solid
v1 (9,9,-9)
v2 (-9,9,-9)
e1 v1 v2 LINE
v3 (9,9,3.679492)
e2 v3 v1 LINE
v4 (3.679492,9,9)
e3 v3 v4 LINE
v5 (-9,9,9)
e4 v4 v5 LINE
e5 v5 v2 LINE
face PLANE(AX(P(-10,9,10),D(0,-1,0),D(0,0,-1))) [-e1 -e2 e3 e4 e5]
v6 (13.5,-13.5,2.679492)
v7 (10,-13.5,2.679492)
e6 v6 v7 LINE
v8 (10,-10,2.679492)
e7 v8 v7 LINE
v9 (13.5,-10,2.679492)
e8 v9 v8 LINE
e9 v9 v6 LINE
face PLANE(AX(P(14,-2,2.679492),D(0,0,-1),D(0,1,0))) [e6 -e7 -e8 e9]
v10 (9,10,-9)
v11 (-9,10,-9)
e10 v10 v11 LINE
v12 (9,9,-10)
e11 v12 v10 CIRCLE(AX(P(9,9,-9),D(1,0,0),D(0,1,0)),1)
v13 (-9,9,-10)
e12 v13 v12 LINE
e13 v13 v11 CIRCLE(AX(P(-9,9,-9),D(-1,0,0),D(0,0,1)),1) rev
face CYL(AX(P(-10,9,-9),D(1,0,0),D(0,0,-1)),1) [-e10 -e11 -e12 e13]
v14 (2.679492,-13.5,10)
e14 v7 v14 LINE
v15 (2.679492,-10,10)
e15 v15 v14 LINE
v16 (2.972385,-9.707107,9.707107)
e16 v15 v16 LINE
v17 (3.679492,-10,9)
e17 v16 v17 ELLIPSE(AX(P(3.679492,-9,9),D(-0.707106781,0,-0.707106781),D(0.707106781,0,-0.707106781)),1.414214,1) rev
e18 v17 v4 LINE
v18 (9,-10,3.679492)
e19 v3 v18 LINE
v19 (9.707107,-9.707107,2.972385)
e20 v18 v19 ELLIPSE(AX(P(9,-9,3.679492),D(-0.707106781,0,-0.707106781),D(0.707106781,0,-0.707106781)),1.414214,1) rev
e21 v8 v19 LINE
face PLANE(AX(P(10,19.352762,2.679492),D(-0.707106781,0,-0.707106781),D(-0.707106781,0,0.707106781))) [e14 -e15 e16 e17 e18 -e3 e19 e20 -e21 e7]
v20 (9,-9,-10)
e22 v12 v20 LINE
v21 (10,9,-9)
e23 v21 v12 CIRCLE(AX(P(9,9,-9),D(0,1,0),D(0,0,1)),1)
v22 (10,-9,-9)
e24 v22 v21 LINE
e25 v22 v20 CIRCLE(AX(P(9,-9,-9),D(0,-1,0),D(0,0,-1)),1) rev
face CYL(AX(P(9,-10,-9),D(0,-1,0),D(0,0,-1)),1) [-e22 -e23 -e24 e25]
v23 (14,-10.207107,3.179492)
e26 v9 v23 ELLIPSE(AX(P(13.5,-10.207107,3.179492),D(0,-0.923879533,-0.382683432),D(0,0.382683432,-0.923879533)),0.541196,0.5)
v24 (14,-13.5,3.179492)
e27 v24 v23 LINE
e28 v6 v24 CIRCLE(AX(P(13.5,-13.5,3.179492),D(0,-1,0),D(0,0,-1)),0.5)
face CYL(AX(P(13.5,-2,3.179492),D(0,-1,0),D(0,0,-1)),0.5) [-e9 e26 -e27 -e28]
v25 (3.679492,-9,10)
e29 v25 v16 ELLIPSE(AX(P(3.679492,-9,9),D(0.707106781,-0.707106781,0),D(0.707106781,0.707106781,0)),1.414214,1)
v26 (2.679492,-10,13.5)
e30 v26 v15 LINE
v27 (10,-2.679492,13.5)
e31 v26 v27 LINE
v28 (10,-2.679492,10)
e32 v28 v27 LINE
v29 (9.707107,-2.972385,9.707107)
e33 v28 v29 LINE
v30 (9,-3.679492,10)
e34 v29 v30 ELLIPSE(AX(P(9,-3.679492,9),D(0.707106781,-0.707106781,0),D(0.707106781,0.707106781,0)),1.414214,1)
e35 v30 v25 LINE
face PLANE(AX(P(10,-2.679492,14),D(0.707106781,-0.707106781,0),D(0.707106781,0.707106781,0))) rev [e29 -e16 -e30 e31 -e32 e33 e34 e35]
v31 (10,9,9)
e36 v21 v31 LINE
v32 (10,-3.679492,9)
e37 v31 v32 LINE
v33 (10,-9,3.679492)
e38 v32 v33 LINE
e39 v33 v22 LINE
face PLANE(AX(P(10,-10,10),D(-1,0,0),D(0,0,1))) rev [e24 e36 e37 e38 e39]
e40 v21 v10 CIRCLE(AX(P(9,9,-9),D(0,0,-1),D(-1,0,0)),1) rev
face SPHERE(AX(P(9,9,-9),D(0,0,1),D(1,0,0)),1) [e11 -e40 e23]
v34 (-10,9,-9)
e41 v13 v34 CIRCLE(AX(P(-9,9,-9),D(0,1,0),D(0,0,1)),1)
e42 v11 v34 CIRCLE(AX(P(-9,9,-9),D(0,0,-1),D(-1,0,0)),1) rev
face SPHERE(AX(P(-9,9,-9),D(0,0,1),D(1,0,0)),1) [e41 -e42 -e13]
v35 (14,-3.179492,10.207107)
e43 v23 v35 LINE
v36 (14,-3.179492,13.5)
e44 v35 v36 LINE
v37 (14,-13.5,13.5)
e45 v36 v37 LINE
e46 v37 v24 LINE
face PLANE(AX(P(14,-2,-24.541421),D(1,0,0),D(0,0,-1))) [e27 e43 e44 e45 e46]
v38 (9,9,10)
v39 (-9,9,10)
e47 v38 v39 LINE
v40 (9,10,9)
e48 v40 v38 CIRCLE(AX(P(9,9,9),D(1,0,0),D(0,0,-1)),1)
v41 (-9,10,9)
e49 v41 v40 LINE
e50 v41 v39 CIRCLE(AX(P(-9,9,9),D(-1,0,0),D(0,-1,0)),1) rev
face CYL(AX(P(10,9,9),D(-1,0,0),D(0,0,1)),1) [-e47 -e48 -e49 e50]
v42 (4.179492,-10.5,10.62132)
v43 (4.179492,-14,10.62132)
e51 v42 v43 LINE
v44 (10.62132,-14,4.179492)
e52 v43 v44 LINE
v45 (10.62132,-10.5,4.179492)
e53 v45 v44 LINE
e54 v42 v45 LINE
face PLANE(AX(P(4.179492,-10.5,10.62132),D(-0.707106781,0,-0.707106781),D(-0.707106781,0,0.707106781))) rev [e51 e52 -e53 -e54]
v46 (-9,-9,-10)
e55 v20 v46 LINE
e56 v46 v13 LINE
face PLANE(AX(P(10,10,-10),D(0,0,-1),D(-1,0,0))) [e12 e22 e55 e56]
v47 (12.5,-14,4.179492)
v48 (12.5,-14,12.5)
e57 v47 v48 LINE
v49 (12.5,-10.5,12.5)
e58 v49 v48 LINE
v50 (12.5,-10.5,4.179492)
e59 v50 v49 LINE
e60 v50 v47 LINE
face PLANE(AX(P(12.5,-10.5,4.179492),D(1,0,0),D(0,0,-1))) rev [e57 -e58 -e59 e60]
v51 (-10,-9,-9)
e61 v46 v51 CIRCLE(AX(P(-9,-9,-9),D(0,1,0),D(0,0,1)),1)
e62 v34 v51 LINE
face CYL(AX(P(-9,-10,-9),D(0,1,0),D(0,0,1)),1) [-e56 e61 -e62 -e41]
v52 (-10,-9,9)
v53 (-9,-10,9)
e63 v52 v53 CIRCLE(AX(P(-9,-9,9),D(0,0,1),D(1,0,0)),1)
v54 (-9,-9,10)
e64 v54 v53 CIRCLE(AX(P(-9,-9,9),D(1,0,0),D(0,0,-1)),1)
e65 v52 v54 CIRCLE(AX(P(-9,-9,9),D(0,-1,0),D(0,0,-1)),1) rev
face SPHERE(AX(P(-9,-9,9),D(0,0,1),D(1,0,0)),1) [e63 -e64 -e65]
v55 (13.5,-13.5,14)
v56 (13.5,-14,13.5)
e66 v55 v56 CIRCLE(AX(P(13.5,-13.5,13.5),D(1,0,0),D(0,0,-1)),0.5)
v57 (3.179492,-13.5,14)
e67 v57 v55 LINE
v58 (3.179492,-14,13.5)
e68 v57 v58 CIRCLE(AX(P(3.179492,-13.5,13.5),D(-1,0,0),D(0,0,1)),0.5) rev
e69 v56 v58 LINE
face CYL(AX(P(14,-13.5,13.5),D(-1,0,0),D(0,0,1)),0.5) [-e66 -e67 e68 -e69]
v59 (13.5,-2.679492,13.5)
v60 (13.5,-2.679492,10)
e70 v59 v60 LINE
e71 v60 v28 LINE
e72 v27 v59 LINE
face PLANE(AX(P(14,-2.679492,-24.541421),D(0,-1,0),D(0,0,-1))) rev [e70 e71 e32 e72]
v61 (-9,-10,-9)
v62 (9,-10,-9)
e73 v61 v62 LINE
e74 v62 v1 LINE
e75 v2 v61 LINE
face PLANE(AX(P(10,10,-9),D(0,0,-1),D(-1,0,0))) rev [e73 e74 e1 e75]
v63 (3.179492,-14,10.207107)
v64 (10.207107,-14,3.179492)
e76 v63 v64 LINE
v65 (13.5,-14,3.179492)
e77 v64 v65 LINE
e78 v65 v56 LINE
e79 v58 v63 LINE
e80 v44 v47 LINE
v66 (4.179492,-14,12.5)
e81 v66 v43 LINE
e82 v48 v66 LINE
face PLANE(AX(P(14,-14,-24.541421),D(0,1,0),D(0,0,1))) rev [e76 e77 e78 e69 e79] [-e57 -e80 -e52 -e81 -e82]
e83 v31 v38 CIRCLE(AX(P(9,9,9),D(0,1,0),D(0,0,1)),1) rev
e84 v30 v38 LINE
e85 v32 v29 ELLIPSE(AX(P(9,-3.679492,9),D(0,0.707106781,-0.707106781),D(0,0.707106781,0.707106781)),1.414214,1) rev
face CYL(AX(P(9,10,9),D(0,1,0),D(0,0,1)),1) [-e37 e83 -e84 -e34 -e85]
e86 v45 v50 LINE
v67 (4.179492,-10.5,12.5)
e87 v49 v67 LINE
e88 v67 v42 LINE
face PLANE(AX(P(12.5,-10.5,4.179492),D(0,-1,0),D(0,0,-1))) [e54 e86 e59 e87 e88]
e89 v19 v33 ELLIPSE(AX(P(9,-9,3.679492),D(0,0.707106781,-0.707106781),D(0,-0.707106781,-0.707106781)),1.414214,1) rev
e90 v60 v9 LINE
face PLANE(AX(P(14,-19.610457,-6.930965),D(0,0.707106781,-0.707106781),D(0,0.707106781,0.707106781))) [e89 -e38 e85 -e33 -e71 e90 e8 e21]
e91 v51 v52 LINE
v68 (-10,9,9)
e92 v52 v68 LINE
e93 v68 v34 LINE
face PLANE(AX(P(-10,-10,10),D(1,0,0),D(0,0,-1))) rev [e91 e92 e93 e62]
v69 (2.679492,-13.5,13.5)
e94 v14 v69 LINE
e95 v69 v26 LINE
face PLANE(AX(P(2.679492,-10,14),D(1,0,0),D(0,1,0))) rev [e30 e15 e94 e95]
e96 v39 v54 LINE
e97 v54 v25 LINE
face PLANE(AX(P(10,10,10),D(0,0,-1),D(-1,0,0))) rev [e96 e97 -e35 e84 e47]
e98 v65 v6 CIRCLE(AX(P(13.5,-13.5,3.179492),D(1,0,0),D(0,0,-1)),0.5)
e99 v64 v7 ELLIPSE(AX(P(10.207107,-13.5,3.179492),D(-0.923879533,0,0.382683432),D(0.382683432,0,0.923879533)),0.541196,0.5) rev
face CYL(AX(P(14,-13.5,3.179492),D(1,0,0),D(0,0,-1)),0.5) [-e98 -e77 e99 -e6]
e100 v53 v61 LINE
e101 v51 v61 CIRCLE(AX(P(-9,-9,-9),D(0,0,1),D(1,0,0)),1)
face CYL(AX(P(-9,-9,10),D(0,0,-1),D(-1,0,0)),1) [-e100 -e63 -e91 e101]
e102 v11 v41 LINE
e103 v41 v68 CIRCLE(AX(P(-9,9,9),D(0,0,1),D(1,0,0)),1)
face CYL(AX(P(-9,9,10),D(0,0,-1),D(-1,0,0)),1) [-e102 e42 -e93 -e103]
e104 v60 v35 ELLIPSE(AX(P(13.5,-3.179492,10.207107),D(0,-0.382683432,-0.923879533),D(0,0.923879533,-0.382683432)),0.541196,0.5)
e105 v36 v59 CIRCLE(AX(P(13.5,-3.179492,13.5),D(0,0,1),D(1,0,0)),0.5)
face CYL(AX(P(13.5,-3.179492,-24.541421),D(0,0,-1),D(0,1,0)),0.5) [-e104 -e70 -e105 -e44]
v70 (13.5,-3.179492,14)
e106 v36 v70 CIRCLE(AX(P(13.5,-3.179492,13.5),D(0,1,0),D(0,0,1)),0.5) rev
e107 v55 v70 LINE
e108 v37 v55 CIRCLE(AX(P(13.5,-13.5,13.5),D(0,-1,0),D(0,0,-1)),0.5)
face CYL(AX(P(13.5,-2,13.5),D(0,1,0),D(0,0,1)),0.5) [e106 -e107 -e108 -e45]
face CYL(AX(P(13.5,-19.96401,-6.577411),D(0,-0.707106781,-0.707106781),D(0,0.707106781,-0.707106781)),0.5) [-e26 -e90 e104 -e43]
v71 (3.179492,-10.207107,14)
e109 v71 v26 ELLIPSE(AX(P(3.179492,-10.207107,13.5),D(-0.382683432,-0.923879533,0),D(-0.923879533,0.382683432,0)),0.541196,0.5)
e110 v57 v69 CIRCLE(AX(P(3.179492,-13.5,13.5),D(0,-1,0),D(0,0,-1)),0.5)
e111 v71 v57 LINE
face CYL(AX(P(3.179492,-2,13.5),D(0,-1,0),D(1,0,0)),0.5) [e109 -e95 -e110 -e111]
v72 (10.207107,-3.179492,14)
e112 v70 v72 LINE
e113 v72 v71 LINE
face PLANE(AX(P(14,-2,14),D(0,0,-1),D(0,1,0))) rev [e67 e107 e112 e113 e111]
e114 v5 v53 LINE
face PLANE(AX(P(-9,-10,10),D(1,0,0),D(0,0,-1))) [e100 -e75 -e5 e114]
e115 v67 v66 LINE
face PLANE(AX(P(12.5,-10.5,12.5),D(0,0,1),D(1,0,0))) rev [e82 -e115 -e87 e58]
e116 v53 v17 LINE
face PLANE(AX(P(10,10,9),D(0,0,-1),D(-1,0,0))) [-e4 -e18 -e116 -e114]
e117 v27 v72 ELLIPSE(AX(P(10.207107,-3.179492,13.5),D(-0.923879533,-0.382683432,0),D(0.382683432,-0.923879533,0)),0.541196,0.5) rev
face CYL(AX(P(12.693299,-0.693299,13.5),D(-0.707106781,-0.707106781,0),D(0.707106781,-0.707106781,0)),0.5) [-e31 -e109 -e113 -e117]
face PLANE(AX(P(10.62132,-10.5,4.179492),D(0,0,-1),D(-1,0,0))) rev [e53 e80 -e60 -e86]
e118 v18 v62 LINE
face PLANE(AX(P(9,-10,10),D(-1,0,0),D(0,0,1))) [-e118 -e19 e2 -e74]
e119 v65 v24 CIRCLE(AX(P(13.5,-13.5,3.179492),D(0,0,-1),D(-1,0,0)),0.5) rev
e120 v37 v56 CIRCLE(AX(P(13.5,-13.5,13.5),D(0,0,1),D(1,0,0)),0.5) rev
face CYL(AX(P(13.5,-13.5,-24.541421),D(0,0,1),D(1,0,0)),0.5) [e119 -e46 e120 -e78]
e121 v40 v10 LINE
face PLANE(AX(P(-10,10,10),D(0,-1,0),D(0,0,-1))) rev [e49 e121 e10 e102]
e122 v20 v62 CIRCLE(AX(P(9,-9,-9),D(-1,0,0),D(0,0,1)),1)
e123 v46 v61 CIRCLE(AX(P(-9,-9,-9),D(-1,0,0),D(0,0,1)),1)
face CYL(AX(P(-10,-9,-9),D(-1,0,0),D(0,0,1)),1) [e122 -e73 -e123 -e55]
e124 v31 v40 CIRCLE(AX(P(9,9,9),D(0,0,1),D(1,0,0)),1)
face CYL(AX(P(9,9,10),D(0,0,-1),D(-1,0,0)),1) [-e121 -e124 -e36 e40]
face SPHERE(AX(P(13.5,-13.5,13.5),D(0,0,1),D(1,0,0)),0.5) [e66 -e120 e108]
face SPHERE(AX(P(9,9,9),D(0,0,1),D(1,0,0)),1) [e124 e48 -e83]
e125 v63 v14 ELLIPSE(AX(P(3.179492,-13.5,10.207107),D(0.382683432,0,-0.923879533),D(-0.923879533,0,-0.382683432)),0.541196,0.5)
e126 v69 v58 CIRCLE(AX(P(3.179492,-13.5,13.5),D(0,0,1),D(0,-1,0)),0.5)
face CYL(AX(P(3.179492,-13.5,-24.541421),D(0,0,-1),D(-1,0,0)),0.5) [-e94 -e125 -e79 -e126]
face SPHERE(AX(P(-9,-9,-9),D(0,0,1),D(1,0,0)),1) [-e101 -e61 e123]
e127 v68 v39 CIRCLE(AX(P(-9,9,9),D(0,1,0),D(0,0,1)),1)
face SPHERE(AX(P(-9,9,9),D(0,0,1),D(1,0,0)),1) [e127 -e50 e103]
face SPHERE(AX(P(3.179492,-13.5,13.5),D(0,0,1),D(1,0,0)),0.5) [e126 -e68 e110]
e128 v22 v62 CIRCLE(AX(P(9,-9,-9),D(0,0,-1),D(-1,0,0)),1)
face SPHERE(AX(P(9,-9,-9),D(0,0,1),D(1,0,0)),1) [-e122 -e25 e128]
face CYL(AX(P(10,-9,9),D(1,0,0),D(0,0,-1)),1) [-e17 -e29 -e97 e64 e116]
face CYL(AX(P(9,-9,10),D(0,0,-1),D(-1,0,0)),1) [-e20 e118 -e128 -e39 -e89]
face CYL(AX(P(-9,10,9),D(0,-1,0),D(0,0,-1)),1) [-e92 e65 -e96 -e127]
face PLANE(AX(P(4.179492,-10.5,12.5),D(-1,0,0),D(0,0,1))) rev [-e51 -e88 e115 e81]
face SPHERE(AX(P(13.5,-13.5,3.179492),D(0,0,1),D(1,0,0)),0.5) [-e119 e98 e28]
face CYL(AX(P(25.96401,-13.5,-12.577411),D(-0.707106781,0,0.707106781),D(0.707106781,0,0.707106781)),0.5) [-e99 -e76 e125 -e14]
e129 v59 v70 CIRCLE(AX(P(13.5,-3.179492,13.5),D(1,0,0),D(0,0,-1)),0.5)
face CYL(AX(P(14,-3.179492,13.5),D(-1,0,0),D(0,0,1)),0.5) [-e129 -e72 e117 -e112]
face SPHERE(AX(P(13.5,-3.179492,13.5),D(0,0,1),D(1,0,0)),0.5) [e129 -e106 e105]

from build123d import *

# Parameters (mm, degrees)
IZIM1_W                     = 20
IZIM1_H                     = 20
Y_KSEKLIK_EKSTR_ZYON1_DEPTH = 10
BO_ALTMA1_T                 = -1
Y_KSEKLIK_EKSTR_ZYON3_DEPTH = 4
Y_KSEKLIK_EKSTR_ZYON4_DEPTH = 4
Y_KSEKLIK_EKSTR_ZYON5_REACH = 33.113
RADYUS1_R                   = 1
RADYUS2_R                   = 1
RADYUS3_R                   = 0.5
KES_EKSTR_ZYON1_DEPTH       = 3.5


with BuildPart() as part:
    # Çizim1 → Yükseklik-Ekstrüzyon1 (new, symmetric)
    with BuildSketch(Plane.XY):
        Rectangle(IZIM1_W, IZIM1_H)
    extrude(amount=Y_KSEKLIK_EKSTR_ZYON1_DEPTH, both=True)

    # İç Boşaltma1
    bo_altma1_openings = [part.faces().sort_by_distance(p)[0] for p in [
        (0, -10, 0),
    ]]
    offset(amount=BO_ALTMA1_T, openings=bo_altma1_openings, kind=Kind.INTERSECTION)

    # Çizim6 → Yükseklik-Ekstrüzyon3 (add)
    with BuildSketch(Plane(origin=(10, 0, 0), x_dir=(0, 0, -1), z_dir=(1, 0, 0))):
        Polygon((-2.679491924, -10), (-10, -2.679491924), (-10, -10), align=None)
        Polygon((-10, -10), (-10, -2.679491924), (-14, -2.679491924), (-14, -14), (-2.679491924, -14), (-2.679491924, -10), align=None)
    extrude(amount=Y_KSEKLIK_EKSTR_ZYON3_DEPTH)

    # Çizim7 → Yükseklik-Ekstrüzyon4 (add)
    with BuildSketch(Plane.XY.offset(10)):
        Polygon((10, -2.679491924), (2.679491924, -10), (2.679491924, -14), (10, -14), align=None)
    extrude(amount=Y_KSEKLIK_EKSTR_ZYON4_DEPTH)

    # Yükseklik-Ekstrüzyon5: up to this face of the body (flat: up to its plane)
    y_kseklik_ekstr_zyon5_end = Plane(part.part.faces().sort_by_distance((0, 9, 0))[0])
    # Çizim8 → Yükseklik-Ekstrüzyon5 (add, up to the picked face)
    with BuildSketch(Plane.XZ.offset(14), mode=Mode.PRIVATE) as y_kseklik_ekstr_zyon5_sk1:
        Polygon((10, 2.679491924), (2.679491924, 10), (10, 10), align=None)
    y_kseklik_ekstr_zyon5_tool1 = split(extrude(y_kseklik_ekstr_zyon5_sk1.sketch, amount=-Y_KSEKLIK_EKSTR_ZYON5_REACH, mode=Mode.PRIVATE), bisect_by=y_kseklik_ekstr_zyon5_end, keep=Keep.BOTH, mode=Mode.PRIVATE)
    add(y_kseklik_ekstr_zyon5_tool1.solids().sort_by(Axis((7.559831, -14, 7.559831), (0, 1, 0)))[0])

    # Radyus1
    # the kernel refuses this fillet: 1 mm, written as the material it takes off along each edge
    with BuildSketch(Plane(origin=(-9, 9, 9), x_dir=(0, 0, 1), z_dir=(-1, 0, 0))) as radyus1_piece_1_section:
        Polygon((0, 0), (RADYUS1_R, 0), (RADYUS1_R, RADYUS1_R), (0, RADYUS1_R), align=None)
    radyus1_piece_1 = extrude(amount=RADYUS1_R, mode=Mode.PRIVATE)
    radyus1_piece_1 = radyus1_piece_1 - Plane(origin=(-9, 9, 9), x_dir=(0, -0.7071067811865475, -0.7071067811865475), z_dir=(-1, 0, 0)) * Sphere(RADYUS1_R, mode=Mode.PRIVATE)
    add(radyus1_piece_1, mode=Mode.SUBTRACT)
    with BuildSketch(Plane(origin=(9, 9, 9), x_dir=(1, 0, 0), z_dir=(0, 0, 1))) as radyus1_piece_2_section:
        Polygon((0, 0), (RADYUS1_R, 0), (RADYUS1_R, RADYUS1_R), (0, RADYUS1_R), align=None)
    radyus1_piece_2 = extrude(amount=RADYUS1_R, mode=Mode.PRIVATE)
    radyus1_piece_2 = radyus1_piece_2 - Plane(origin=(9, 9, 9), x_dir=(-0.7071067811865475, -0.7071067811865475, 0), z_dir=(0, 0, 1)) * Sphere(RADYUS1_R, mode=Mode.PRIVATE)
    add(radyus1_piece_2, mode=Mode.SUBTRACT)
    with BuildSketch(Plane(origin=(-9, 9, -9), x_dir=(0, 1, 0), z_dir=(-1, 0, 0))) as radyus1_piece_3_section:
        Polygon((0, 0), (RADYUS1_R, 0), (RADYUS1_R, RADYUS1_R), (0, RADYUS1_R), align=None)
    radyus1_piece_3 = extrude(amount=RADYUS1_R, mode=Mode.PRIVATE)
    radyus1_piece_3 = radyus1_piece_3 - Plane(origin=(-9, 9, -9), x_dir=(0, -0.7071067811865475, 0.7071067811865475), z_dir=(-1, 0, 0)) * Sphere(RADYUS1_R, mode=Mode.PRIVATE)
    add(radyus1_piece_3, mode=Mode.SUBTRACT)
    with BuildSketch(Plane(origin=(9, 9, -9), x_dir=(1, 0, 0), z_dir=(0, 1, 0))) as radyus1_piece_4_section:
        Polygon((0, 0), (RADYUS1_R, 0), (RADYUS1_R, RADYUS1_R), (0, RADYUS1_R), align=None)
    radyus1_piece_4 = extrude(amount=RADYUS1_R, mode=Mode.PRIVATE)
    radyus1_piece_4 = radyus1_piece_4 - Plane(origin=(9, 9, -9), x_dir=(-0.7071067811865475, 0, 0.7071067811865475), z_dir=(0, 1, 0)) * Sphere(RADYUS1_R, mode=Mode.PRIVATE)
    add(radyus1_piece_4, mode=Mode.SUBTRACT)
    with BuildSketch(Plane(origin=(-10, 9, 10), x_dir=(0, 0, -1), z_dir=(0, -1, 0))) as radyus1_piece_5:
        with BuildLine():
            CenterArc((RADYUS1_R, RADYUS1_R), RADYUS1_R, 180, 90)
            Line((0, RADYUS1_R), (0, 0))
            Line((0, 0), (RADYUS1_R, 0))
        make_face()
    extrude(amount=21.5, mode=Mode.SUBTRACT)
    with BuildSketch(Plane(origin=(10, -5.179491924, 10), x_dir=(0, 0, -1), z_dir=(0, 1, 0))) as radyus1_piece_6_section:
        with BuildLine():
            CenterArc((RADYUS1_R, RADYUS1_R), RADYUS1_R, 180, 90)
            Line((0, RADYUS1_R), (0, 0))
            Line((0, 0), (RADYUS1_R, 0))
        make_face()
    radyus1_piece_6 = extrude(amount=14.179491924, mode=Mode.PRIVATE)
    radyus1_piece_6 = split(radyus1_piece_6, bisect_by=Plane(origin=(9.471072473, -2.843960274, 9.83553165), z_dir=(0, -0.7071067811865475, 0.7071067811865477)), keep=Keep.TOP, mode=Mode.PRIVATE)
    radyus1_piece_6 = split(radyus1_piece_6, bisect_by=Plane(origin=(9.592558865, -3.086933059, 9.957018042), z_dir=(-0.7071067811865479, 0.7071067811865472, 0)), keep=Keep.TOP, mode=Mode.PRIVATE)
    add(radyus1_piece_6, mode=Mode.SUBTRACT)
    with BuildSketch(Plane(origin=(10, -5.179491924, 10), x_dir=(0, 0, -1), z_dir=(0, 1, 0))) as radyus1_piece_7_section:
        with BuildLine():
            CenterArc((RADYUS1_R, RADYUS1_R), RADYUS1_R, 180, 90)
            Line((0, RADYUS1_R), (0, 0))
            Line((0, 0), (RADYUS1_R, 0))
        make_face()
    radyus1_piece_7 = extrude(amount=14.179491924, mode=Mode.PRIVATE)
    radyus1_piece_7 = split(radyus1_piece_7, bisect_by=Plane(origin=(9.957018042, -3.086933059, 9.592558865), z_dir=(0, 0.7071067811865475, -0.7071067811865477)), keep=Keep.TOP, mode=Mode.PRIVATE)
    radyus1_piece_7 = split(radyus1_piece_7, bisect_by=Plane(origin=(9.83553165, -2.843960274, 9.471072473), z_dir=(0.7071067811865479, -0.7071067811865472, 0)), keep=Keep.TOP, mode=Mode.PRIVATE)
    add(radyus1_piece_7, mode=Mode.SUBTRACT)
    with BuildSketch(Plane(origin=(10, -5.179491924, 10), x_dir=(0, 0, -1), z_dir=(0, 1, 0))) as radyus1_piece_8_section:
        with BuildLine():
            CenterArc((RADYUS1_R, RADYUS1_R), RADYUS1_R, 180, 90)
            Line((0, RADYUS1_R), (0, 0))
            Line((0, 0), (RADYUS1_R, 0))
        make_face()
    radyus1_piece_8 = extrude(amount=14.179491924, mode=Mode.PRIVATE)
    radyus1_piece_8 = split(radyus1_piece_8, bisect_by=Plane(origin=(9.773566739, 0.108490737, 12.787982661), z_dir=(0, 0.7071067811865475, -0.7071067811865477)), keep=Keep.TOP, mode=Mode.PRIVATE)
    radyus1_piece_8 = split(radyus1_piece_8, bisect_by=Plane(origin=(12.787982661, 0.108490737, 9.773566739), z_dir=(-0.7071067811865479, 0.7071067811865472, 0)), keep=Keep.TOP, mode=Mode.PRIVATE)
    add(radyus1_piece_8, mode=Mode.SUBTRACT)
    with BuildSketch(Plane(origin=(-10, 9, -10), x_dir=(0, 0, 1), z_dir=(0, -1, 0)), Plane(origin=(10, -12.5, -10), x_dir=(0, 0, 1), z_dir=(0, 1, 0))) as radyus1_piece_9:
        with BuildLine():
            CenterArc((RADYUS1_R, -RADYUS1_R), RADYUS1_R, 90, 90)
            Line((0, -RADYUS1_R), (0, 0))
            Line((0, 0), (RADYUS1_R, 0))
        make_face()
    extrude(amount=21.5, mode=Mode.SUBTRACT)
    with BuildSketch(Plane(origin=(9, 10, -10), x_dir=(0, 0, 1), z_dir=(-1, 0, 0)), Plane(origin=(-10, 10, 9), x_dir=(0, -1, 0), z_dir=(0, 0, -1))) as radyus1_piece_10:
        with BuildLine():
            CenterArc((RADYUS1_R, -RADYUS1_R), RADYUS1_R, 90, 90)
            Line((0, -RADYUS1_R), (0, 0))
            Line((0, 0), (RADYUS1_R, 0))
        make_face()
    extrude(amount=18, mode=Mode.SUBTRACT)
    with BuildSketch(Plane(origin=(9, 10, 10), x_dir=(0, 0, -1), z_dir=(-1, 0, 0)), Plane(origin=(10, 10, -9), x_dir=(-1, 0, 0), z_dir=(0, 0, 1))) as radyus1_piece_11:
        with BuildLine():
            CenterArc((RADYUS1_R, RADYUS1_R), RADYUS1_R, 180, 90)
            Line((0, RADYUS1_R), (0, 0))
            Line((0, 0), (RADYUS1_R, 0))
        make_face()
    extrude(amount=18, mode=Mode.SUBTRACT)

    # Radyus2
    # the kernel refuses this fillet: 1 mm, written as the material it takes off along each edge
    with BuildSketch(Plane(origin=(-9, -10, 10), x_dir=(0, 0, -1), z_dir=(1, 0, 0))) as radyus2_piece_1_section:
        with BuildLine():
            CenterArc((RADYUS2_R, RADYUS2_R), RADYUS2_R, 180, 90)
            Line((0, RADYUS2_R), (0, 0))
            Line((0, 0), (RADYUS2_R, 0))
        make_face()
    radyus2_piece_1 = extrude(amount=14.179491924, mode=Mode.PRIVATE)
    radyus2_piece_1 = split(radyus2_piece_1, bisect_by=Plane(origin=(-0.108490737, -9.773566739, 12.787982661), z_dir=(-0.7071067811865476, 0, -0.7071067811865475)), keep=Keep.TOP, mode=Mode.PRIVATE)
    radyus2_piece_1 = split(radyus2_piece_1, bisect_by=Plane(origin=(-0.108490737, -12.787982661, 9.773566739), z_dir=(-0.7071067811865479, 0.7071067811865472, 0)), keep=Keep.TOP, mode=Mode.PRIVATE)
    add(radyus2_piece_1, mode=Mode.SUBTRACT)
    with BuildSketch(Plane(origin=(-9, -10, 10), x_dir=(0, 0, -1), z_dir=(1, 0, 0))) as radyus2_piece_2_section:
        with BuildLine():
            CenterArc((RADYUS2_R, RADYUS2_R), RADYUS2_R, 180, 90)
            Line((0, RADYUS2_R), (0, 0))
            Line((0, 0), (RADYUS2_R, 0))
        make_face()
    radyus2_piece_2 = extrude(amount=14.179491924, mode=Mode.PRIVATE)
    radyus2_piece_2 = split(radyus2_piece_2, bisect_by=Plane(origin=(2.843960274, -9.471072473, 9.83553165), z_dir=(0.7071067811865476, 0, 0.7071067811865475)), keep=Keep.TOP, mode=Mode.PRIVATE)
    radyus2_piece_2 = split(radyus2_piece_2, bisect_by=Plane(origin=(3.086933059, -9.592558865, 9.957018042), z_dir=(-0.7071067811865479, 0.7071067811865472, 0)), keep=Keep.TOP, mode=Mode.PRIVATE)
    add(radyus2_piece_2, mode=Mode.SUBTRACT)
    with BuildSketch(Plane(origin=(-9, -10, 10), x_dir=(0, 0, -1), z_dir=(1, 0, 0))) as radyus2_piece_3_section:
        with BuildLine():
            CenterArc((RADYUS2_R, RADYUS2_R), RADYUS2_R, 180, 90)
            Line((0, RADYUS2_R), (0, 0))
            Line((0, 0), (RADYUS2_R, 0))
        make_face()
    radyus2_piece_3 = extrude(amount=14.179491924, mode=Mode.PRIVATE)
    radyus2_piece_3 = split(radyus2_piece_3, bisect_by=Plane(origin=(3.086933059, -9.957018042, 9.592558865), z_dir=(-0.7071067811865476, 0, -0.7071067811865475)), keep=Keep.TOP, mode=Mode.PRIVATE)
    radyus2_piece_3 = split(radyus2_piece_3, bisect_by=Plane(origin=(2.843960274, -9.83553165, 9.471072473), z_dir=(0.7071067811865479, -0.7071067811865472, 0)), keep=Keep.TOP, mode=Mode.PRIVATE)
    add(radyus2_piece_3, mode=Mode.SUBTRACT)
    with BuildSketch(Plane(origin=(-9, -10, 9), x_dir=(-1, 0, 0), z_dir=(0, 0, -1))) as radyus2_piece_4:
        with BuildLine():
            CenterArc((1 - RADYUS2_R, RADYUS2_R), RADYUS2_R, 270, 90)
            Line((1 - RADYUS2_R, 0), (1, 0))
            Line((1, 0), (1, RADYUS2_R))
        make_face()
    revolve(axis=Axis((-9, -10, 9), (0, 1, 0)), revolution_arc=90, mode=Mode.SUBTRACT)
    with BuildSketch(Plane(origin=(-10, -10, 9), x_dir=(0, 1, 0), z_dir=(0, 0, -1))) as radyus2_piece_5:
        with BuildLine():
            CenterArc((RADYUS2_R, RADYUS2_R), RADYUS2_R, 180, 90)
            Line((0, RADYUS2_R), (0, 0))
            Line((0, 0), (RADYUS2_R, 0))
        make_face()
    extrude(amount=18, mode=Mode.SUBTRACT)
    with BuildSketch(Plane(origin=(-9, -10, -9), x_dir=(0, 0, -1), z_dir=(1, 0, 0))) as radyus2_piece_6:
        with BuildLine():
            CenterArc((1 - RADYUS2_R, RADYUS2_R), RADYUS2_R, 270, 90)
            Line((1, RADYUS2_R), (1, 0))
            Line((1, 0), (1 - RADYUS2_R, 0))
        make_face()
    revolve(axis=Axis((-9, -10, -9), (0, 1, 0)), revolution_arc=90, mode=Mode.SUBTRACT)
    with BuildSketch(Plane(origin=(-9, -10, -10), x_dir=(0, 0, 1), z_dir=(1, 0, 0))) as radyus2_piece_7:
        with BuildLine():
            CenterArc((RADYUS2_R, -RADYUS2_R), RADYUS2_R, 90, 90)
            Line((0, -RADYUS2_R), (0, 0))
            Line((0, 0), (RADYUS2_R, 0))
        make_face()
    extrude(amount=18, mode=Mode.SUBTRACT)
    with BuildSketch(Plane(origin=(9, -10, -9), x_dir=(0, 0, -1), z_dir=(-1, 0, 0))) as radyus2_piece_8:
        with BuildLine():
            CenterArc((1 - RADYUS2_R, -RADYUS2_R), RADYUS2_R, 0, 90)
            Line((1, -RADYUS2_R), (1, 0))
            Line((1, 0), (1 - RADYUS2_R, 0))
        make_face()
    revolve(axis=Axis((9, -10, -9), (0, -1, 0)), revolution_arc=90, mode=Mode.SUBTRACT)
    with BuildSketch(Plane(origin=(10, -10, -9), x_dir=(-1, 0, 0), z_dir=(0, 0, 1))) as radyus2_piece_9_section:
        with BuildLine():
            CenterArc((RADYUS2_R, -RADYUS2_R), RADYUS2_R, 90, 90)
            Line((0, -RADYUS2_R), (0, 0))
            Line((0, 0), (RADYUS2_R, 0))
        make_face()
    radyus2_piece_9 = extrude(amount=14.179491924, mode=Mode.PRIVATE)
    radyus2_piece_9 = split(radyus2_piece_9, bisect_by=Plane(origin=(12.787982661, -9.773566739, -0.108490737), z_dir=(-0.7071067811865476, 0, -0.7071067811865475)), keep=Keep.TOP, mode=Mode.PRIVATE)
    radyus2_piece_9 = split(radyus2_piece_9, bisect_by=Plane(origin=(9.773566739, -12.787982661, -0.108490737), z_dir=(0, 0.7071067811865475, -0.7071067811865477)), keep=Keep.TOP, mode=Mode.PRIVATE)
    add(radyus2_piece_9, mode=Mode.SUBTRACT)
    with BuildSketch(Plane(origin=(10, -10, -9), x_dir=(-1, 0, 0), z_dir=(0, 0, 1))) as radyus2_piece_10_section:
        with BuildLine():
            CenterArc((RADYUS2_R, -RADYUS2_R), RADYUS2_R, 90, 90)
            Line((0, -RADYUS2_R), (0, 0))
            Line((0, 0), (RADYUS2_R, 0))
        make_face()
    radyus2_piece_10 = extrude(amount=14.179491924, mode=Mode.PRIVATE)
    radyus2_piece_10 = split(radyus2_piece_10, bisect_by=Plane(origin=(9.83553165, -9.471072473, 2.843960274), z_dir=(0.7071067811865476, 0, 0.7071067811865475)), keep=Keep.TOP, mode=Mode.PRIVATE)
    radyus2_piece_10 = split(radyus2_piece_10, bisect_by=Plane(origin=(9.957018042, -9.592558865, 3.086933059), z_dir=(0, 0.7071067811865475, -0.7071067811865477)), keep=Keep.TOP, mode=Mode.PRIVATE)
    add(radyus2_piece_10, mode=Mode.SUBTRACT)
    with BuildSketch(Plane(origin=(10, -10, -9), x_dir=(-1, 0, 0), z_dir=(0, 0, 1))) as radyus2_piece_11_section:
        with BuildLine():
            CenterArc((RADYUS2_R, -RADYUS2_R), RADYUS2_R, 90, 90)
            Line((0, -RADYUS2_R), (0, 0))
            Line((0, 0), (RADYUS2_R, 0))
        make_face()
    radyus2_piece_11 = extrude(amount=14.179491924, mode=Mode.PRIVATE)
    radyus2_piece_11 = split(radyus2_piece_11, bisect_by=Plane(origin=(9.592558865, -9.957018042, 3.086933059), z_dir=(-0.7071067811865476, 0, -0.7071067811865475)), keep=Keep.TOP, mode=Mode.PRIVATE)
    radyus2_piece_11 = split(radyus2_piece_11, bisect_by=Plane(origin=(9.471072473, -9.83553165, 2.843960274), z_dir=(0, -0.7071067811865475, 0.7071067811865477)), keep=Keep.TOP, mode=Mode.PRIVATE)
    add(radyus2_piece_11, mode=Mode.SUBTRACT)

    # Radyus3
    radyus3_edges = [part.edges().sort_by_distance(p)[0] for p in [
        (14, -6.339745962, 6.339745962),
        (12, -2.679491924, 14),
        (8.339745962, -14, 14),
        (14, -12, 2.679491924),
        (12, -14, 2.679491924),
        (14, -2.679491924, 12),
        (14, -8.339745962, 14),
        (14, -14, 8.339745962),
        (2.679491924, -14, 12),
        (6.339745962, -6.339745962, 14),
        (2.679491924, -12, 14),
        (6.339745962, -14, 6.339745962),
    ]]
    fillet(radyus3_edges, radius=RADYUS3_R)

    # Çizim9 → Kes-Ekstrüzyon1 (cut)
    with BuildSketch(Plane.XZ.offset(14)):
        Polygon((12.5, 4.179491924), (12.5, 12.5), (4.179491924, 12.5), (4.179491924, 10.621320344), (10.621320344, 4.179491924), align=None)
    extrude(amount=-KES_EKSTR_ZYON1_DEPTH, mode=Mode.SUBTRACT)


solid = part.part
